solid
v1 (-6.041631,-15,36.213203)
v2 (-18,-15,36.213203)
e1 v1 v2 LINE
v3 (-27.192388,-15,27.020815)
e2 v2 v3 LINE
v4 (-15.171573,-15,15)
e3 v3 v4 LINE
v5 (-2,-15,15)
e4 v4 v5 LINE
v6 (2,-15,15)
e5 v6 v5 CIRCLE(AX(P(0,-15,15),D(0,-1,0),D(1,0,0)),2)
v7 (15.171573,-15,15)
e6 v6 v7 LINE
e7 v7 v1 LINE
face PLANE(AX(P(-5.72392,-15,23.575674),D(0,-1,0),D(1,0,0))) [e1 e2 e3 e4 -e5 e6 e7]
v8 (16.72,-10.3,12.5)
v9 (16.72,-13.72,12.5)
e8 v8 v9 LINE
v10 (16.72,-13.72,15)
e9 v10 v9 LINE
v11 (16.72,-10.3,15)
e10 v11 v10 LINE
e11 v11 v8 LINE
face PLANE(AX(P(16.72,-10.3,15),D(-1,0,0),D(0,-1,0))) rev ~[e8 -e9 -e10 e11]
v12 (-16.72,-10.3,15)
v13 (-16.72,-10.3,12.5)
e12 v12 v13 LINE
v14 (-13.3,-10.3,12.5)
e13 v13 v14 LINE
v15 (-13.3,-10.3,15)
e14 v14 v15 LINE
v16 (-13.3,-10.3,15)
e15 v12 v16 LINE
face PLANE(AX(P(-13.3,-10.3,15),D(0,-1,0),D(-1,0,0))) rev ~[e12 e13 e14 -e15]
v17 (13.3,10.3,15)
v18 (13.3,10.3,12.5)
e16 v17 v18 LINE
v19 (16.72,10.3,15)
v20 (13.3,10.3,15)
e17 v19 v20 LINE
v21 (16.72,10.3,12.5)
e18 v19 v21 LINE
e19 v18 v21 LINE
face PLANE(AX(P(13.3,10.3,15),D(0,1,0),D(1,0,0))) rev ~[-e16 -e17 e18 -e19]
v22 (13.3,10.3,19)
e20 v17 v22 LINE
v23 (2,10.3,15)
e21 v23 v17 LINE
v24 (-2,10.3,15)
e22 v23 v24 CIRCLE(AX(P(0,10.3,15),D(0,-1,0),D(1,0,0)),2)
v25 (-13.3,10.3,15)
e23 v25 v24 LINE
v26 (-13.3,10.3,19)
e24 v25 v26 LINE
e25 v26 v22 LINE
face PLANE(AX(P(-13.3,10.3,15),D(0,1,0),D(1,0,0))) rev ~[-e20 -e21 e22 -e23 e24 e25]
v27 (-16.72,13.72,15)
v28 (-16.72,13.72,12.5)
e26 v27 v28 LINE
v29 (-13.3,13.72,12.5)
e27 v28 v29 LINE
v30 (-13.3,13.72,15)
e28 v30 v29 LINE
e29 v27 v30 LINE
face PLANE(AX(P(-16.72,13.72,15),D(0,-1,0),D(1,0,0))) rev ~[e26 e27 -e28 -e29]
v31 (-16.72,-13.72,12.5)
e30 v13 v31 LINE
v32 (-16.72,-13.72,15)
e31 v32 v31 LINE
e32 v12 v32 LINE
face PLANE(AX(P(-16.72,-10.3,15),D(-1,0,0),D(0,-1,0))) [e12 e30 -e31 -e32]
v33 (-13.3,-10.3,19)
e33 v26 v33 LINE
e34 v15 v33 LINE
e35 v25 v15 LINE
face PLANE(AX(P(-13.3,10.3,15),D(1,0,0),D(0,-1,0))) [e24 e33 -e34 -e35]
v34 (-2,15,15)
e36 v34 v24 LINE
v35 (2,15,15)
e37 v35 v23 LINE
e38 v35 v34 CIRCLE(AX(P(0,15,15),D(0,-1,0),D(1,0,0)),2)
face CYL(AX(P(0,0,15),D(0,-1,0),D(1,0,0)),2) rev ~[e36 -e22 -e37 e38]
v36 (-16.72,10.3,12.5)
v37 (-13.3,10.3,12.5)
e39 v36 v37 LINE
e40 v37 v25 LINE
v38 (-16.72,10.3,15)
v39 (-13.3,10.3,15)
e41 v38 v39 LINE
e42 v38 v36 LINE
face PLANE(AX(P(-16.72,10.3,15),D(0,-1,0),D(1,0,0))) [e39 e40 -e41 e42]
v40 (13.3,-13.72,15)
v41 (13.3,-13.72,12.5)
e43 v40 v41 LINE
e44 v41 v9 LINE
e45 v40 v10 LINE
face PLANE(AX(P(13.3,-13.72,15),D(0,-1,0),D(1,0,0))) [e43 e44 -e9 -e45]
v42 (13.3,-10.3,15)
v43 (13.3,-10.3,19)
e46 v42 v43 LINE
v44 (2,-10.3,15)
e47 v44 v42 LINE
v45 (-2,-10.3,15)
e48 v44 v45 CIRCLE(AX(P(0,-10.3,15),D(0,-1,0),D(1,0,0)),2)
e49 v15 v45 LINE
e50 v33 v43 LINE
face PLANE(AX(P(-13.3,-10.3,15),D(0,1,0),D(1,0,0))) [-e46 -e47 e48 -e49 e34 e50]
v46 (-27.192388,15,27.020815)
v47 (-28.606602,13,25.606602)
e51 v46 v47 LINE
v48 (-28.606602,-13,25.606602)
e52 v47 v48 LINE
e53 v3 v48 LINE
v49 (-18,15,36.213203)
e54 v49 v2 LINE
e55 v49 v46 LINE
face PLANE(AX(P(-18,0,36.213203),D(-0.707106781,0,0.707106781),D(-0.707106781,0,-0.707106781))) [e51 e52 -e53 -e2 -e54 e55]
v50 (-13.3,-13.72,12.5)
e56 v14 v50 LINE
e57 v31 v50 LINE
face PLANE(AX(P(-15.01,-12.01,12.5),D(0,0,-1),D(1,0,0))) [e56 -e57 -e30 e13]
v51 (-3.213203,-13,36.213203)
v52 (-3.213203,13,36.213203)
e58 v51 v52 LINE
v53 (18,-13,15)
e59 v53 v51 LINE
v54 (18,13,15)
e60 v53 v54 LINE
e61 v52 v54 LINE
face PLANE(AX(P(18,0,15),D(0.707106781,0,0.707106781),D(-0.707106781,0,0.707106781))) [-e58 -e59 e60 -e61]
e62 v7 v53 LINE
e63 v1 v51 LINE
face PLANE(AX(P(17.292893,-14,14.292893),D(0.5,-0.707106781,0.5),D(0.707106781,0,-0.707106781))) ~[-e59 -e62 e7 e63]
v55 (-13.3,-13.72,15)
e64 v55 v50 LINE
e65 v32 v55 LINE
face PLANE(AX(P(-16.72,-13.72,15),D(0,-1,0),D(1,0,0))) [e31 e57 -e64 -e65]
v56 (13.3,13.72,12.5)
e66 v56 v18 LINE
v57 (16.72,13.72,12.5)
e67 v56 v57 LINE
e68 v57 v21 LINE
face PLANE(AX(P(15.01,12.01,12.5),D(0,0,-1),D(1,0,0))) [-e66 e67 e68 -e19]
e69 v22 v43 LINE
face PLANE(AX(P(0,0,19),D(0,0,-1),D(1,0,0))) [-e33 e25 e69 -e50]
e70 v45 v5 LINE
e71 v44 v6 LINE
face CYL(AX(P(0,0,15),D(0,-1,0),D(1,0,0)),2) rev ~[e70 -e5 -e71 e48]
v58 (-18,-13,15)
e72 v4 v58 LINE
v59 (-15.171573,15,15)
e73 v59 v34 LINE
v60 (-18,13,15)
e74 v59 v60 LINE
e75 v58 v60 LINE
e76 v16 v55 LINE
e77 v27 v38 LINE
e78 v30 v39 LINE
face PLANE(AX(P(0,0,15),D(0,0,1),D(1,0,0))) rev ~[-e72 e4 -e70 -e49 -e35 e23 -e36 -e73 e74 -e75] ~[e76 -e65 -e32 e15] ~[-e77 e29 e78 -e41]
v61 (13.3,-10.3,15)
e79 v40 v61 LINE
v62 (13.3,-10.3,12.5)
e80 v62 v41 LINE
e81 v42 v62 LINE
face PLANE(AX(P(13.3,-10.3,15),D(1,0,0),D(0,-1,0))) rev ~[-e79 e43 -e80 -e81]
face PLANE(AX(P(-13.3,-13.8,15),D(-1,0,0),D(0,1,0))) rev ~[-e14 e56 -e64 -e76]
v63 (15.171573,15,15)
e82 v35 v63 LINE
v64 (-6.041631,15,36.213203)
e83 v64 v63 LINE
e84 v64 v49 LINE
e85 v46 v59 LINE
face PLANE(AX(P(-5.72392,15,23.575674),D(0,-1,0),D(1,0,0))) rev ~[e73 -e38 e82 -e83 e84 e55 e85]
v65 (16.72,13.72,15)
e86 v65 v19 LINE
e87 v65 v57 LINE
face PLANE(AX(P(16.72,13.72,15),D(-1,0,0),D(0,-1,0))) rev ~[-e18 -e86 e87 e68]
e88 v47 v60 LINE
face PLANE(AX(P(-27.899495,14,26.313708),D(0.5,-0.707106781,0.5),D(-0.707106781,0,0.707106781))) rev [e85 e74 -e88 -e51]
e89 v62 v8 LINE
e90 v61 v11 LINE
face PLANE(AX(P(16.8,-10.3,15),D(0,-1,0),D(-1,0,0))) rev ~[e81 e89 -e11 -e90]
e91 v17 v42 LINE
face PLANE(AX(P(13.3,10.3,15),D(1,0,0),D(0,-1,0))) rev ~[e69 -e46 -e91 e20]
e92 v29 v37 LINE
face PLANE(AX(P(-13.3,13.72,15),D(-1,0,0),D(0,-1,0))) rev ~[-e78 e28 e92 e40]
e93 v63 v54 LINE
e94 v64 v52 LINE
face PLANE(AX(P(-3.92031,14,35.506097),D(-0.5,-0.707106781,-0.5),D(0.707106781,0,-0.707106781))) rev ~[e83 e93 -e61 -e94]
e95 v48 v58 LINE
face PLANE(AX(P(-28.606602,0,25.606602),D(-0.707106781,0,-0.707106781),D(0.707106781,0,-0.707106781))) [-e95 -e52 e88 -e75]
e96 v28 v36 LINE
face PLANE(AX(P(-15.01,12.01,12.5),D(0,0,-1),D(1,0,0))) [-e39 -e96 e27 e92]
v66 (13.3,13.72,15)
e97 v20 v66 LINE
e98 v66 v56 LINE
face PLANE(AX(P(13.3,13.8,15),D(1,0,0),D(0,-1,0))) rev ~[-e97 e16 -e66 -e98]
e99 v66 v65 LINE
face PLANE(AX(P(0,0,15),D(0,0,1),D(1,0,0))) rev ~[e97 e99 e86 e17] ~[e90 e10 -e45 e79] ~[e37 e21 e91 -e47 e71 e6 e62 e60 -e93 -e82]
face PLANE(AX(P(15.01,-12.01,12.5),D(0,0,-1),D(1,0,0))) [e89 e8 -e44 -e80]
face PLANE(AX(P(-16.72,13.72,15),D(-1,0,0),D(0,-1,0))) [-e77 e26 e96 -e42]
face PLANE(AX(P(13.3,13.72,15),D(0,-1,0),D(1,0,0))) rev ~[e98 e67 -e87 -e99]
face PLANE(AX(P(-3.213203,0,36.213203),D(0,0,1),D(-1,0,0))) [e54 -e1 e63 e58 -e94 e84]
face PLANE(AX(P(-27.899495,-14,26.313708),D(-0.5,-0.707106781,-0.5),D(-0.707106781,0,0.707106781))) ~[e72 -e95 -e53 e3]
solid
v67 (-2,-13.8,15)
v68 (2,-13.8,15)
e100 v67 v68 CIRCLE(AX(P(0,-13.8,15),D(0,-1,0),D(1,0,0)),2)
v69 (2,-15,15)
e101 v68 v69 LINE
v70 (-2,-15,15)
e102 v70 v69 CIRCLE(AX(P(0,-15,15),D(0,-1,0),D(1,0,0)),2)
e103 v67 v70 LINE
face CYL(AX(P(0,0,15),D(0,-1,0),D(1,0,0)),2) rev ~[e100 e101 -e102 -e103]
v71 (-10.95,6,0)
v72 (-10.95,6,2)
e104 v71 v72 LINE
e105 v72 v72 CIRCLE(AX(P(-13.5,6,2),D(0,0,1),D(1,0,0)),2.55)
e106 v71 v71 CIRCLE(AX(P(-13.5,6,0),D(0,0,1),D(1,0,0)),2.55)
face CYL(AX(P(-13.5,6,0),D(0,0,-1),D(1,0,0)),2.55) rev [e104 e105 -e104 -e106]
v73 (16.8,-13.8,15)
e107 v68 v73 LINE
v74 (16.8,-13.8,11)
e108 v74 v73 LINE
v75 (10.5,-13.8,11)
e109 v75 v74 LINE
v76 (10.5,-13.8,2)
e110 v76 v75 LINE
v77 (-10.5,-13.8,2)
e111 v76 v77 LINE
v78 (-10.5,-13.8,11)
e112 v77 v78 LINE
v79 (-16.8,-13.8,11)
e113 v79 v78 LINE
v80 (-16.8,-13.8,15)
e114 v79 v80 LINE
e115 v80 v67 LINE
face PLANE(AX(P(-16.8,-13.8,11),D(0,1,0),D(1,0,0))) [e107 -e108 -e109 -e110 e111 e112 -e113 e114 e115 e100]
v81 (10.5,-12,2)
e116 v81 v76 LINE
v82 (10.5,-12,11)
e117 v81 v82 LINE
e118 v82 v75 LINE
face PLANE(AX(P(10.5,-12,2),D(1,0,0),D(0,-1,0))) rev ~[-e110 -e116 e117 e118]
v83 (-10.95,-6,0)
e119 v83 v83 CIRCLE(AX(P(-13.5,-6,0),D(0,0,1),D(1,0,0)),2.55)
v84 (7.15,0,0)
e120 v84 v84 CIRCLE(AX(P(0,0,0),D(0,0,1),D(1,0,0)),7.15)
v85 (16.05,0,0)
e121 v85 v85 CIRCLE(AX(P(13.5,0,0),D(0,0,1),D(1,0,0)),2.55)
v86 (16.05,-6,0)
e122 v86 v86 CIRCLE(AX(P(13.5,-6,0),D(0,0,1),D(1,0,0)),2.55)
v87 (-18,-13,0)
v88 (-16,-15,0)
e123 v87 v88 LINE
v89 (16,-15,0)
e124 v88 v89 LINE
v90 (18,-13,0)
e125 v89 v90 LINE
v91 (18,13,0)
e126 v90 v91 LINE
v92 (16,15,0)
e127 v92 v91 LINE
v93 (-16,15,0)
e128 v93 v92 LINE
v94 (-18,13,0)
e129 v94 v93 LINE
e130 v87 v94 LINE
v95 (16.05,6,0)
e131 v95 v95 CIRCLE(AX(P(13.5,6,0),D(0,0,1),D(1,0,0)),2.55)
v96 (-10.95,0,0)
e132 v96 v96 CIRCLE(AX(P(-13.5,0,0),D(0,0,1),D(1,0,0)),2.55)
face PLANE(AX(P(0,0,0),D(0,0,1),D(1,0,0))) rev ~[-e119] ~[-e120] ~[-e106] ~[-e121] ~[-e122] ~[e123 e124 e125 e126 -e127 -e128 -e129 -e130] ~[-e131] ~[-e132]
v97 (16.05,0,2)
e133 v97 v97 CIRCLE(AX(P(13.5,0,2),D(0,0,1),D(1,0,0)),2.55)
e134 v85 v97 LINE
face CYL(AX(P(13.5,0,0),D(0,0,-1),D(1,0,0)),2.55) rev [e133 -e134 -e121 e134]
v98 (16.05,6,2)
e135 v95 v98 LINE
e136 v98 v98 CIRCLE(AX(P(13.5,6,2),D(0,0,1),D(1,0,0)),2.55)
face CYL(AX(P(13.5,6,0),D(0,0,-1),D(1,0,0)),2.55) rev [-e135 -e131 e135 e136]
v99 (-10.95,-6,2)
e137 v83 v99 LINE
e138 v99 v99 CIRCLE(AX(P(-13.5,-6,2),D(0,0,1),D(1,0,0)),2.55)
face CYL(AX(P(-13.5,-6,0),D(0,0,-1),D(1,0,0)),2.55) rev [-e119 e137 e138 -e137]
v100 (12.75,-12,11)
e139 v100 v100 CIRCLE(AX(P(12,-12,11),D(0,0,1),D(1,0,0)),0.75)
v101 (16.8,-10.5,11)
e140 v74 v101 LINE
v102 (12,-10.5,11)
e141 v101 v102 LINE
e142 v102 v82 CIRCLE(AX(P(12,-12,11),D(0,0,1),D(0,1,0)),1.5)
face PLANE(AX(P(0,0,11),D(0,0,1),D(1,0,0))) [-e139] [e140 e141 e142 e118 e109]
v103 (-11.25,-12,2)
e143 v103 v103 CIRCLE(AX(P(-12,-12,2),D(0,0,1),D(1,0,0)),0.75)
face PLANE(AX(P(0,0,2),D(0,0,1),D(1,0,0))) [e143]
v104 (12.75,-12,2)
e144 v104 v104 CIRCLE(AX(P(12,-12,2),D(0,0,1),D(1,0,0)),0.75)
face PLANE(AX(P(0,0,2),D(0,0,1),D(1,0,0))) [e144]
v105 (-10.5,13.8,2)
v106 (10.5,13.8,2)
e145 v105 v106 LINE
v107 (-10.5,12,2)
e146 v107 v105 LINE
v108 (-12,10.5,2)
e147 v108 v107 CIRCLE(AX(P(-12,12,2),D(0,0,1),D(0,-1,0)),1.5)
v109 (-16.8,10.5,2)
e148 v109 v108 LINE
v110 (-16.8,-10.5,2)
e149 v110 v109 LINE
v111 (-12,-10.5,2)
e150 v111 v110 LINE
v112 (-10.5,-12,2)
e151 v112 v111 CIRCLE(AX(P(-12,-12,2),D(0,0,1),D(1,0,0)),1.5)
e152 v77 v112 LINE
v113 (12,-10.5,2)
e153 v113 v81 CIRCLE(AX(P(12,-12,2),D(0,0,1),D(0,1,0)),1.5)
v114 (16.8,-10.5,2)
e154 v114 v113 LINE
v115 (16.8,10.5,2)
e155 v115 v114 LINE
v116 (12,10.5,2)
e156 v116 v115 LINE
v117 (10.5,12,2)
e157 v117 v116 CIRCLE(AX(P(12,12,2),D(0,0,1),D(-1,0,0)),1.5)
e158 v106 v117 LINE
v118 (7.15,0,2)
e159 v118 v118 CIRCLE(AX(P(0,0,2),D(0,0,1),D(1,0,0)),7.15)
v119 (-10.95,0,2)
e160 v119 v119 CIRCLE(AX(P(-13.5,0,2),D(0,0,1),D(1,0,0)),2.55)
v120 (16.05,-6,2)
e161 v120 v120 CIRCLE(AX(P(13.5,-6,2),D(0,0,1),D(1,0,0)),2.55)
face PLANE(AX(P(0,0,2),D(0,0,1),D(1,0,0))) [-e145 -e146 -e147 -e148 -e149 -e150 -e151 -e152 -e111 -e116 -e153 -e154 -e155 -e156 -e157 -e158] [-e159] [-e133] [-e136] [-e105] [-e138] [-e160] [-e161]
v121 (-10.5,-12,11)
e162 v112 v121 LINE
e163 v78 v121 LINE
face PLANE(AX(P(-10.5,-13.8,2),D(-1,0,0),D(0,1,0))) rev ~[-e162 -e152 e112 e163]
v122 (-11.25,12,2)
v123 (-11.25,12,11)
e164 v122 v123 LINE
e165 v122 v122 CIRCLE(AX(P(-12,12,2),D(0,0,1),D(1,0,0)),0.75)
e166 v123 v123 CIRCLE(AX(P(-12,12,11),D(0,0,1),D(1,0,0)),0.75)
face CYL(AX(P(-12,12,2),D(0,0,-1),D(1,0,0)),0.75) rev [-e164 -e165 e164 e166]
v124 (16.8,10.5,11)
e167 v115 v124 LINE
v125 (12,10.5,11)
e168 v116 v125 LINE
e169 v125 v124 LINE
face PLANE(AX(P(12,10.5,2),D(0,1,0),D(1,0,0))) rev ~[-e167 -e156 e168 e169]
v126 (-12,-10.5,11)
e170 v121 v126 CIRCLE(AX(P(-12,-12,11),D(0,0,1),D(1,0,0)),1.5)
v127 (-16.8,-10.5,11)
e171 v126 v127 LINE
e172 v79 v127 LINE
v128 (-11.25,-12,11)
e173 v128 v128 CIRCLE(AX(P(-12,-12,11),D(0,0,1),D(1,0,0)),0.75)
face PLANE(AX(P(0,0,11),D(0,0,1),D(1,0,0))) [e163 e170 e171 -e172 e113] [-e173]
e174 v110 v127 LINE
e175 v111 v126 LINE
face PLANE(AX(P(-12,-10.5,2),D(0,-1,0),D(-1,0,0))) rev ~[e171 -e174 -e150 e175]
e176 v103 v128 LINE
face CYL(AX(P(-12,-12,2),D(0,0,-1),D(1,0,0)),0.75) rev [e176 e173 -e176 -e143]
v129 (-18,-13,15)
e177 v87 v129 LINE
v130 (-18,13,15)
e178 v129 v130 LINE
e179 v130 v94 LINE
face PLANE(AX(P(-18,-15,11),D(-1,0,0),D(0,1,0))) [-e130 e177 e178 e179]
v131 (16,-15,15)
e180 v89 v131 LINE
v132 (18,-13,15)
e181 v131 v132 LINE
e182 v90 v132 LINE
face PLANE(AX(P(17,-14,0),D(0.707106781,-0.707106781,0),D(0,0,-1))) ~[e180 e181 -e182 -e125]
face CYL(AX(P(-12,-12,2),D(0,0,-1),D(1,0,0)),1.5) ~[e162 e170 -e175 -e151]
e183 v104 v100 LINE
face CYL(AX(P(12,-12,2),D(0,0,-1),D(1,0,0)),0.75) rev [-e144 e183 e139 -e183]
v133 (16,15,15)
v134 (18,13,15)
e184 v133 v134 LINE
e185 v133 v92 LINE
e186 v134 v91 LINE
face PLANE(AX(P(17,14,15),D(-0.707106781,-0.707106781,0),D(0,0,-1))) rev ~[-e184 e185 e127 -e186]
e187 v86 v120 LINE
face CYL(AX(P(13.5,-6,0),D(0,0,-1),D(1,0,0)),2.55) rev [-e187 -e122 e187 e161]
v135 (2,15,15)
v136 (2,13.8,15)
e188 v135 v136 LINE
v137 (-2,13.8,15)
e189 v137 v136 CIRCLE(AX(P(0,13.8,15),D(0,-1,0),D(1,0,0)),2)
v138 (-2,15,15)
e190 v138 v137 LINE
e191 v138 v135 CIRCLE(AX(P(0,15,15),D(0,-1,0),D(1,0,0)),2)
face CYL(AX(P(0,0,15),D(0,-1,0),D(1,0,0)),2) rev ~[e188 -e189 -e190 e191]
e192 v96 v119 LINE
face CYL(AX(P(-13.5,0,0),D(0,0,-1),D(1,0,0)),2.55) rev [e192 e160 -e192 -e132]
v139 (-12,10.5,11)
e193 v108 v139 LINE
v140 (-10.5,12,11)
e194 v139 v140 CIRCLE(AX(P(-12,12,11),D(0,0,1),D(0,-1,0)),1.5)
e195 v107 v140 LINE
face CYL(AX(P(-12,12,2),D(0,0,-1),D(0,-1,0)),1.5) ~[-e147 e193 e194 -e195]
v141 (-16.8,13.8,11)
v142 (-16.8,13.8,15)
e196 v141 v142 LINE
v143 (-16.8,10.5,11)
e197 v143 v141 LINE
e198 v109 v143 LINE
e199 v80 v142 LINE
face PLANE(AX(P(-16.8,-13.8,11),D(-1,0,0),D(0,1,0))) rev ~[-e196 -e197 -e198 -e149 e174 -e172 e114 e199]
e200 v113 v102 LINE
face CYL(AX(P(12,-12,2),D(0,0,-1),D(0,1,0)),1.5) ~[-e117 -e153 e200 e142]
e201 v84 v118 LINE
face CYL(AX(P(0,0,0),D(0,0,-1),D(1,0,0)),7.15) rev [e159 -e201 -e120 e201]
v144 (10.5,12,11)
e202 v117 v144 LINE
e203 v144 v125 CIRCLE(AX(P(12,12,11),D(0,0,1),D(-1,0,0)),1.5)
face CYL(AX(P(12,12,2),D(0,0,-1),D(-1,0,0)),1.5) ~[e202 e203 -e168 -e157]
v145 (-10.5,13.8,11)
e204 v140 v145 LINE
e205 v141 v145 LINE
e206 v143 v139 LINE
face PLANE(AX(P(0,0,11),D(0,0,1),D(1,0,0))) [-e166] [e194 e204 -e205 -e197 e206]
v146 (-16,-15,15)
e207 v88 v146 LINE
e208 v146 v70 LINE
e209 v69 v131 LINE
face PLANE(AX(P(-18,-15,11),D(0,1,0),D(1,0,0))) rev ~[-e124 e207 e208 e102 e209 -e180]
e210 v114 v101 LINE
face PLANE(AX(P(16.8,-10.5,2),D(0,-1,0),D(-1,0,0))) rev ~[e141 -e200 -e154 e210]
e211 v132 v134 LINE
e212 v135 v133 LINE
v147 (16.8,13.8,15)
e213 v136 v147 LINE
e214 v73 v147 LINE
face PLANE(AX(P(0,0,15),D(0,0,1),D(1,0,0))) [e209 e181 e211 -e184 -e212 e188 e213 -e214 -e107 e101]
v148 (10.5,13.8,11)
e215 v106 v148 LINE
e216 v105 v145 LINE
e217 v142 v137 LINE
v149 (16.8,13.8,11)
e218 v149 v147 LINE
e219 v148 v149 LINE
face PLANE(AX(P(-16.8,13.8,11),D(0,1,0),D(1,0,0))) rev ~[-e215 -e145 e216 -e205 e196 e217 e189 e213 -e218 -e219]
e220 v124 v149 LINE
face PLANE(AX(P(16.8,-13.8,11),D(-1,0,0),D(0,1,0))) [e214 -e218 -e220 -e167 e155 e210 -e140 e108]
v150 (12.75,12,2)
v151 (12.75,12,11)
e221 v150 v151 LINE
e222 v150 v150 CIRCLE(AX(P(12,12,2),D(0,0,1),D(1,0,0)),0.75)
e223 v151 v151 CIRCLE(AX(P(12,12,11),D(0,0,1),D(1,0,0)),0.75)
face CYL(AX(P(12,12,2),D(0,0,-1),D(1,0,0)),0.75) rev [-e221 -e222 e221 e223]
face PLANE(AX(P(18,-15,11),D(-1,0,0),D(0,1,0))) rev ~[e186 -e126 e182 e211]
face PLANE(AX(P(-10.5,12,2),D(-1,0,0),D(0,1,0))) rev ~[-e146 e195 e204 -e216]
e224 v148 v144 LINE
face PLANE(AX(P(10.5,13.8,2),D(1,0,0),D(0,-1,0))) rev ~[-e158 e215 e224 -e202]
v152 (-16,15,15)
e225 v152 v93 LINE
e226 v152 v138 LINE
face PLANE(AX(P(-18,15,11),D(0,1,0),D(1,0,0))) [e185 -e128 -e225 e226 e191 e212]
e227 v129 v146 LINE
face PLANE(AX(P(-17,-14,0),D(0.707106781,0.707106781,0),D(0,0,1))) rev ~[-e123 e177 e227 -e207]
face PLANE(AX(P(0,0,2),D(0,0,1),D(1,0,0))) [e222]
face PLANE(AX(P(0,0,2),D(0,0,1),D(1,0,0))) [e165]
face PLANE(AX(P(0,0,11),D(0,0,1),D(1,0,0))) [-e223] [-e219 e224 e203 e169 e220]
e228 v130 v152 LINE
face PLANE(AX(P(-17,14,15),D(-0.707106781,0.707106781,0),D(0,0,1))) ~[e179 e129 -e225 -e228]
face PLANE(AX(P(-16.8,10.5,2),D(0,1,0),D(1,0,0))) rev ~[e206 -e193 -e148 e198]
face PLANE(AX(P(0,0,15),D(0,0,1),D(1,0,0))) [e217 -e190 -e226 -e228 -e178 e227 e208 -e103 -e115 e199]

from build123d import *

# Parameters (mm, degrees)
F1_W       = 36
F1_H       = 30
F1_R       = 2.55
F1_R_2     = 7.15
F2_DEPTH   = 2
F3_W       = 36
F3_H       = 30
F3_R       = 0.75
F4_DEPTH   = 9
F5_W       = 36
F5_H       = 30
F5_W_2     = 33.6
F5_H_2     = 27.6
F6_DEPTH   = 4
F7_W       = 36
F7_H       = 30
F8_DEPTH   = 4
F9_W       = 3.42
F9_H       = 3.42
F10_DEPTH  = 2.5
F11_W      = 36
F11_H      = 30
F12_DEPTH  = 2
F14_DEPTH  = 15
F16_DEPTH  = 18
F17_W      = 26.6
F17_H      = 20.6
F18_DEPTH  = 4
F19_R      = 2
F20_DEPTH  = 1000
F21_SIZE   = 2
F21_2_SIZE = 2


# Not quite as in the source:
# - a feature names something its author has since deleted; it is built from what else it names


with BuildPart() as f2:
    # F1 (on Top) → F2 (new body)
    with BuildSketch(Plane.XY):
        Rectangle(F1_W, F1_H)
        with Locations((-13.5, -6)):
            Circle(F1_R, mode=Mode.SUBTRACT)
        with Locations((13.5, -6)):
            Circle(F1_R, mode=Mode.SUBTRACT)
        with Locations((-13.5, 0)):
            Circle(F1_R, mode=Mode.SUBTRACT)
        with Locations((-13.5, 6)):
            Circle(F1_R, mode=Mode.SUBTRACT)
        Circle(F1_R_2, mode=Mode.SUBTRACT)
        with Locations((13.5, 0)):
            Circle(F1_R, mode=Mode.SUBTRACT)
        with Locations((13.5, 6)):
            Circle(F1_R, mode=Mode.SUBTRACT)
    extrude(amount=F2_DEPTH)

    # F3 (on face) → F4 (join)
    with BuildSketch(Plane.XY.offset(2)):
        Rectangle(F3_W, F3_H)
        with Locations((-12, -12)):
            Circle(F3_R, mode=Mode.SUBTRACT)
        with Locations((12, -12)):
            Circle(F3_R, mode=Mode.SUBTRACT)
        with Locations((-12, 12)):
            Circle(F3_R, mode=Mode.SUBTRACT)
        with BuildLine():
            Line((-16.8, 10.5), (-12, 10.5))
            ThreePointArc((-12, 10.5), (-10.9393398282, 10.9393398282), (-10.5, 12))
            Line((-10.5, 12), (-10.5, 13.8))
            Line((-10.5, 13.8), (10.5, 13.8))
            Line((10.5, 13.8), (10.5, 12))
            ThreePointArc((10.5, 12), (10.9393398282, 10.9393398282), (12, 10.5))
            Line((12, 10.5), (16.8, 10.5))
            Line((16.8, 10.5), (16.8, -10.5))
            Line((16.8, -10.5), (12, -10.5))
            ThreePointArc((12, -10.5), (10.9393398282, -10.9393398282), (10.5, -12))
            Line((10.5, -12), (10.5, -13.8))
            Line((10.5, -13.8), (-10.5, -13.8))
            Line((-10.5, -13.8), (-10.5, -12))
            ThreePointArc((-10.5, -12), (-10.9393398282, -10.9393398282), (-12, -10.5))
            Line((-12, -10.5), (-16.8, -10.5))
            Line((-16.8, -10.5), (-16.8, 10.5))
        make_face(mode=Mode.SUBTRACT)
        with Locations((12, 12)):
            Circle(F3_R, mode=Mode.SUBTRACT)
    extrude(amount=F4_DEPTH)

    # F5 (on face) → F6 (join)
    with BuildSketch(Plane.XY.offset(11)):
        Rectangle(F5_W, F5_H)
        Rectangle(F5_W_2, F5_H_2, mode=Mode.SUBTRACT)
    extrude(amount=F6_DEPTH)


with BuildPart() as f8:
    # F7 (on face) → F8 (new body)
    with BuildSketch(Plane.XY.offset(15)):
        Rectangle(F7_W, F7_H)
        Polygon((-16.8, -10.3), (-16.8, 10.3), (-13.3, 10.3), (-13.3, 13.8), (13.3, 13.8), (13.3, 10.3), (16.8, 10.3), (16.8, -10.3), (13.3, -10.3), (13.3, -13.8), (-13.3, -13.8), (-13.3, -10.3), align=None, mode=Mode.SUBTRACT)
    extrude(amount=F8_DEPTH)

    # F9 (on face) → F10 (join)
    with BuildSketch(Plane(origin=(0, 0, 15), x_dir=(1, 0, 0), z_dir=(0, 0, -1))):
        with Locations((-15.01, -12.01)):
            Rectangle(F9_W, F9_H)
        with Locations((15.01, -12.01)):
            Rectangle(F9_W, F9_H)
        with Locations((-15.01, 12.01)):
            Rectangle(F9_W, F9_H)
        with Locations((15.01, 12.01)):
            Rectangle(F9_W, F9_H)
    extrude(amount=F10_DEPTH)

    # F11 (on face) → F12 (join)
    with BuildSketch(Plane.XY.offset(19)):
        Rectangle(F11_W, F11_H)
    extrude(amount=F12_DEPTH)

    # F13 (on Front) → F14 (join, symmetric)
    with BuildSketch(Plane.XZ):
        Polygon((-3.2132034356, 36.2132034356), (-18, 36.2132034356), (-28.6066017178, 25.6066017178), (-18, 15), (18, 15), align=None)
    extrude(amount=F14_DEPTH, both=True)

    # F15 (on Front) → F16 (cut, symmetric)
    with BuildSketch(Plane.XZ):
        Polygon((18, 21), (12, 21), (18, 15), align=None)
    extrude(amount=F16_DEPTH, both=True, mode=Mode.SUBTRACT)

    # F17 (on face) → F18 (cut)
    with BuildSketch(Plane(origin=(0, 0, 15), x_dir=(1, 0, 0), z_dir=(0, 0, -1))):
        Rectangle(F17_W, F17_H)
    extrude(amount=-F18_DEPTH, mode=Mode.SUBTRACT)


with BuildPart() as f20_tool:
    # F19 (on Front) → F20 (new body, symmetric)
    with BuildSketch(Plane.XZ):
        with Locations((0, 15)):
            Circle(F19_R)
    extrude(amount=F20_DEPTH, both=True)


with BuildPart() as f2_1:
    add(f2.part)

    # F20: cut by f20_tool
    add(f20_tool.part, mode=Mode.SUBTRACT)

    # F21
    f21_edges = [f2_1.edges().sort_by_distance(p)[0] for p in [
        (-18, 15, 7.5),
        (-18, -15, 7.5),
        (18, -15, 7.5),
        (18, 15, 7.5),
    ]]
    chamfer(f21_edges, length=F21_SIZE)


with BuildPart() as f8_1:
    add(f8.part)

    # F20: cut by f20_tool
    add(f20_tool.part, mode=Mode.SUBTRACT)

    # F21#2
    f21_2_edges = [f8_1.edges().sort_by_distance(p)[0] for p in [
        (-23.303301, -15, 20.303301),
        (-23.303301, 15, 20.303301),
        (7.393398, 15, 25.606602),
        (7.393398, -15, 25.606602),
    ]]
    chamfer(f21_2_edges, length=F21_2_SIZE)


solid = Compound([f2_1.part, f8_1.part])
